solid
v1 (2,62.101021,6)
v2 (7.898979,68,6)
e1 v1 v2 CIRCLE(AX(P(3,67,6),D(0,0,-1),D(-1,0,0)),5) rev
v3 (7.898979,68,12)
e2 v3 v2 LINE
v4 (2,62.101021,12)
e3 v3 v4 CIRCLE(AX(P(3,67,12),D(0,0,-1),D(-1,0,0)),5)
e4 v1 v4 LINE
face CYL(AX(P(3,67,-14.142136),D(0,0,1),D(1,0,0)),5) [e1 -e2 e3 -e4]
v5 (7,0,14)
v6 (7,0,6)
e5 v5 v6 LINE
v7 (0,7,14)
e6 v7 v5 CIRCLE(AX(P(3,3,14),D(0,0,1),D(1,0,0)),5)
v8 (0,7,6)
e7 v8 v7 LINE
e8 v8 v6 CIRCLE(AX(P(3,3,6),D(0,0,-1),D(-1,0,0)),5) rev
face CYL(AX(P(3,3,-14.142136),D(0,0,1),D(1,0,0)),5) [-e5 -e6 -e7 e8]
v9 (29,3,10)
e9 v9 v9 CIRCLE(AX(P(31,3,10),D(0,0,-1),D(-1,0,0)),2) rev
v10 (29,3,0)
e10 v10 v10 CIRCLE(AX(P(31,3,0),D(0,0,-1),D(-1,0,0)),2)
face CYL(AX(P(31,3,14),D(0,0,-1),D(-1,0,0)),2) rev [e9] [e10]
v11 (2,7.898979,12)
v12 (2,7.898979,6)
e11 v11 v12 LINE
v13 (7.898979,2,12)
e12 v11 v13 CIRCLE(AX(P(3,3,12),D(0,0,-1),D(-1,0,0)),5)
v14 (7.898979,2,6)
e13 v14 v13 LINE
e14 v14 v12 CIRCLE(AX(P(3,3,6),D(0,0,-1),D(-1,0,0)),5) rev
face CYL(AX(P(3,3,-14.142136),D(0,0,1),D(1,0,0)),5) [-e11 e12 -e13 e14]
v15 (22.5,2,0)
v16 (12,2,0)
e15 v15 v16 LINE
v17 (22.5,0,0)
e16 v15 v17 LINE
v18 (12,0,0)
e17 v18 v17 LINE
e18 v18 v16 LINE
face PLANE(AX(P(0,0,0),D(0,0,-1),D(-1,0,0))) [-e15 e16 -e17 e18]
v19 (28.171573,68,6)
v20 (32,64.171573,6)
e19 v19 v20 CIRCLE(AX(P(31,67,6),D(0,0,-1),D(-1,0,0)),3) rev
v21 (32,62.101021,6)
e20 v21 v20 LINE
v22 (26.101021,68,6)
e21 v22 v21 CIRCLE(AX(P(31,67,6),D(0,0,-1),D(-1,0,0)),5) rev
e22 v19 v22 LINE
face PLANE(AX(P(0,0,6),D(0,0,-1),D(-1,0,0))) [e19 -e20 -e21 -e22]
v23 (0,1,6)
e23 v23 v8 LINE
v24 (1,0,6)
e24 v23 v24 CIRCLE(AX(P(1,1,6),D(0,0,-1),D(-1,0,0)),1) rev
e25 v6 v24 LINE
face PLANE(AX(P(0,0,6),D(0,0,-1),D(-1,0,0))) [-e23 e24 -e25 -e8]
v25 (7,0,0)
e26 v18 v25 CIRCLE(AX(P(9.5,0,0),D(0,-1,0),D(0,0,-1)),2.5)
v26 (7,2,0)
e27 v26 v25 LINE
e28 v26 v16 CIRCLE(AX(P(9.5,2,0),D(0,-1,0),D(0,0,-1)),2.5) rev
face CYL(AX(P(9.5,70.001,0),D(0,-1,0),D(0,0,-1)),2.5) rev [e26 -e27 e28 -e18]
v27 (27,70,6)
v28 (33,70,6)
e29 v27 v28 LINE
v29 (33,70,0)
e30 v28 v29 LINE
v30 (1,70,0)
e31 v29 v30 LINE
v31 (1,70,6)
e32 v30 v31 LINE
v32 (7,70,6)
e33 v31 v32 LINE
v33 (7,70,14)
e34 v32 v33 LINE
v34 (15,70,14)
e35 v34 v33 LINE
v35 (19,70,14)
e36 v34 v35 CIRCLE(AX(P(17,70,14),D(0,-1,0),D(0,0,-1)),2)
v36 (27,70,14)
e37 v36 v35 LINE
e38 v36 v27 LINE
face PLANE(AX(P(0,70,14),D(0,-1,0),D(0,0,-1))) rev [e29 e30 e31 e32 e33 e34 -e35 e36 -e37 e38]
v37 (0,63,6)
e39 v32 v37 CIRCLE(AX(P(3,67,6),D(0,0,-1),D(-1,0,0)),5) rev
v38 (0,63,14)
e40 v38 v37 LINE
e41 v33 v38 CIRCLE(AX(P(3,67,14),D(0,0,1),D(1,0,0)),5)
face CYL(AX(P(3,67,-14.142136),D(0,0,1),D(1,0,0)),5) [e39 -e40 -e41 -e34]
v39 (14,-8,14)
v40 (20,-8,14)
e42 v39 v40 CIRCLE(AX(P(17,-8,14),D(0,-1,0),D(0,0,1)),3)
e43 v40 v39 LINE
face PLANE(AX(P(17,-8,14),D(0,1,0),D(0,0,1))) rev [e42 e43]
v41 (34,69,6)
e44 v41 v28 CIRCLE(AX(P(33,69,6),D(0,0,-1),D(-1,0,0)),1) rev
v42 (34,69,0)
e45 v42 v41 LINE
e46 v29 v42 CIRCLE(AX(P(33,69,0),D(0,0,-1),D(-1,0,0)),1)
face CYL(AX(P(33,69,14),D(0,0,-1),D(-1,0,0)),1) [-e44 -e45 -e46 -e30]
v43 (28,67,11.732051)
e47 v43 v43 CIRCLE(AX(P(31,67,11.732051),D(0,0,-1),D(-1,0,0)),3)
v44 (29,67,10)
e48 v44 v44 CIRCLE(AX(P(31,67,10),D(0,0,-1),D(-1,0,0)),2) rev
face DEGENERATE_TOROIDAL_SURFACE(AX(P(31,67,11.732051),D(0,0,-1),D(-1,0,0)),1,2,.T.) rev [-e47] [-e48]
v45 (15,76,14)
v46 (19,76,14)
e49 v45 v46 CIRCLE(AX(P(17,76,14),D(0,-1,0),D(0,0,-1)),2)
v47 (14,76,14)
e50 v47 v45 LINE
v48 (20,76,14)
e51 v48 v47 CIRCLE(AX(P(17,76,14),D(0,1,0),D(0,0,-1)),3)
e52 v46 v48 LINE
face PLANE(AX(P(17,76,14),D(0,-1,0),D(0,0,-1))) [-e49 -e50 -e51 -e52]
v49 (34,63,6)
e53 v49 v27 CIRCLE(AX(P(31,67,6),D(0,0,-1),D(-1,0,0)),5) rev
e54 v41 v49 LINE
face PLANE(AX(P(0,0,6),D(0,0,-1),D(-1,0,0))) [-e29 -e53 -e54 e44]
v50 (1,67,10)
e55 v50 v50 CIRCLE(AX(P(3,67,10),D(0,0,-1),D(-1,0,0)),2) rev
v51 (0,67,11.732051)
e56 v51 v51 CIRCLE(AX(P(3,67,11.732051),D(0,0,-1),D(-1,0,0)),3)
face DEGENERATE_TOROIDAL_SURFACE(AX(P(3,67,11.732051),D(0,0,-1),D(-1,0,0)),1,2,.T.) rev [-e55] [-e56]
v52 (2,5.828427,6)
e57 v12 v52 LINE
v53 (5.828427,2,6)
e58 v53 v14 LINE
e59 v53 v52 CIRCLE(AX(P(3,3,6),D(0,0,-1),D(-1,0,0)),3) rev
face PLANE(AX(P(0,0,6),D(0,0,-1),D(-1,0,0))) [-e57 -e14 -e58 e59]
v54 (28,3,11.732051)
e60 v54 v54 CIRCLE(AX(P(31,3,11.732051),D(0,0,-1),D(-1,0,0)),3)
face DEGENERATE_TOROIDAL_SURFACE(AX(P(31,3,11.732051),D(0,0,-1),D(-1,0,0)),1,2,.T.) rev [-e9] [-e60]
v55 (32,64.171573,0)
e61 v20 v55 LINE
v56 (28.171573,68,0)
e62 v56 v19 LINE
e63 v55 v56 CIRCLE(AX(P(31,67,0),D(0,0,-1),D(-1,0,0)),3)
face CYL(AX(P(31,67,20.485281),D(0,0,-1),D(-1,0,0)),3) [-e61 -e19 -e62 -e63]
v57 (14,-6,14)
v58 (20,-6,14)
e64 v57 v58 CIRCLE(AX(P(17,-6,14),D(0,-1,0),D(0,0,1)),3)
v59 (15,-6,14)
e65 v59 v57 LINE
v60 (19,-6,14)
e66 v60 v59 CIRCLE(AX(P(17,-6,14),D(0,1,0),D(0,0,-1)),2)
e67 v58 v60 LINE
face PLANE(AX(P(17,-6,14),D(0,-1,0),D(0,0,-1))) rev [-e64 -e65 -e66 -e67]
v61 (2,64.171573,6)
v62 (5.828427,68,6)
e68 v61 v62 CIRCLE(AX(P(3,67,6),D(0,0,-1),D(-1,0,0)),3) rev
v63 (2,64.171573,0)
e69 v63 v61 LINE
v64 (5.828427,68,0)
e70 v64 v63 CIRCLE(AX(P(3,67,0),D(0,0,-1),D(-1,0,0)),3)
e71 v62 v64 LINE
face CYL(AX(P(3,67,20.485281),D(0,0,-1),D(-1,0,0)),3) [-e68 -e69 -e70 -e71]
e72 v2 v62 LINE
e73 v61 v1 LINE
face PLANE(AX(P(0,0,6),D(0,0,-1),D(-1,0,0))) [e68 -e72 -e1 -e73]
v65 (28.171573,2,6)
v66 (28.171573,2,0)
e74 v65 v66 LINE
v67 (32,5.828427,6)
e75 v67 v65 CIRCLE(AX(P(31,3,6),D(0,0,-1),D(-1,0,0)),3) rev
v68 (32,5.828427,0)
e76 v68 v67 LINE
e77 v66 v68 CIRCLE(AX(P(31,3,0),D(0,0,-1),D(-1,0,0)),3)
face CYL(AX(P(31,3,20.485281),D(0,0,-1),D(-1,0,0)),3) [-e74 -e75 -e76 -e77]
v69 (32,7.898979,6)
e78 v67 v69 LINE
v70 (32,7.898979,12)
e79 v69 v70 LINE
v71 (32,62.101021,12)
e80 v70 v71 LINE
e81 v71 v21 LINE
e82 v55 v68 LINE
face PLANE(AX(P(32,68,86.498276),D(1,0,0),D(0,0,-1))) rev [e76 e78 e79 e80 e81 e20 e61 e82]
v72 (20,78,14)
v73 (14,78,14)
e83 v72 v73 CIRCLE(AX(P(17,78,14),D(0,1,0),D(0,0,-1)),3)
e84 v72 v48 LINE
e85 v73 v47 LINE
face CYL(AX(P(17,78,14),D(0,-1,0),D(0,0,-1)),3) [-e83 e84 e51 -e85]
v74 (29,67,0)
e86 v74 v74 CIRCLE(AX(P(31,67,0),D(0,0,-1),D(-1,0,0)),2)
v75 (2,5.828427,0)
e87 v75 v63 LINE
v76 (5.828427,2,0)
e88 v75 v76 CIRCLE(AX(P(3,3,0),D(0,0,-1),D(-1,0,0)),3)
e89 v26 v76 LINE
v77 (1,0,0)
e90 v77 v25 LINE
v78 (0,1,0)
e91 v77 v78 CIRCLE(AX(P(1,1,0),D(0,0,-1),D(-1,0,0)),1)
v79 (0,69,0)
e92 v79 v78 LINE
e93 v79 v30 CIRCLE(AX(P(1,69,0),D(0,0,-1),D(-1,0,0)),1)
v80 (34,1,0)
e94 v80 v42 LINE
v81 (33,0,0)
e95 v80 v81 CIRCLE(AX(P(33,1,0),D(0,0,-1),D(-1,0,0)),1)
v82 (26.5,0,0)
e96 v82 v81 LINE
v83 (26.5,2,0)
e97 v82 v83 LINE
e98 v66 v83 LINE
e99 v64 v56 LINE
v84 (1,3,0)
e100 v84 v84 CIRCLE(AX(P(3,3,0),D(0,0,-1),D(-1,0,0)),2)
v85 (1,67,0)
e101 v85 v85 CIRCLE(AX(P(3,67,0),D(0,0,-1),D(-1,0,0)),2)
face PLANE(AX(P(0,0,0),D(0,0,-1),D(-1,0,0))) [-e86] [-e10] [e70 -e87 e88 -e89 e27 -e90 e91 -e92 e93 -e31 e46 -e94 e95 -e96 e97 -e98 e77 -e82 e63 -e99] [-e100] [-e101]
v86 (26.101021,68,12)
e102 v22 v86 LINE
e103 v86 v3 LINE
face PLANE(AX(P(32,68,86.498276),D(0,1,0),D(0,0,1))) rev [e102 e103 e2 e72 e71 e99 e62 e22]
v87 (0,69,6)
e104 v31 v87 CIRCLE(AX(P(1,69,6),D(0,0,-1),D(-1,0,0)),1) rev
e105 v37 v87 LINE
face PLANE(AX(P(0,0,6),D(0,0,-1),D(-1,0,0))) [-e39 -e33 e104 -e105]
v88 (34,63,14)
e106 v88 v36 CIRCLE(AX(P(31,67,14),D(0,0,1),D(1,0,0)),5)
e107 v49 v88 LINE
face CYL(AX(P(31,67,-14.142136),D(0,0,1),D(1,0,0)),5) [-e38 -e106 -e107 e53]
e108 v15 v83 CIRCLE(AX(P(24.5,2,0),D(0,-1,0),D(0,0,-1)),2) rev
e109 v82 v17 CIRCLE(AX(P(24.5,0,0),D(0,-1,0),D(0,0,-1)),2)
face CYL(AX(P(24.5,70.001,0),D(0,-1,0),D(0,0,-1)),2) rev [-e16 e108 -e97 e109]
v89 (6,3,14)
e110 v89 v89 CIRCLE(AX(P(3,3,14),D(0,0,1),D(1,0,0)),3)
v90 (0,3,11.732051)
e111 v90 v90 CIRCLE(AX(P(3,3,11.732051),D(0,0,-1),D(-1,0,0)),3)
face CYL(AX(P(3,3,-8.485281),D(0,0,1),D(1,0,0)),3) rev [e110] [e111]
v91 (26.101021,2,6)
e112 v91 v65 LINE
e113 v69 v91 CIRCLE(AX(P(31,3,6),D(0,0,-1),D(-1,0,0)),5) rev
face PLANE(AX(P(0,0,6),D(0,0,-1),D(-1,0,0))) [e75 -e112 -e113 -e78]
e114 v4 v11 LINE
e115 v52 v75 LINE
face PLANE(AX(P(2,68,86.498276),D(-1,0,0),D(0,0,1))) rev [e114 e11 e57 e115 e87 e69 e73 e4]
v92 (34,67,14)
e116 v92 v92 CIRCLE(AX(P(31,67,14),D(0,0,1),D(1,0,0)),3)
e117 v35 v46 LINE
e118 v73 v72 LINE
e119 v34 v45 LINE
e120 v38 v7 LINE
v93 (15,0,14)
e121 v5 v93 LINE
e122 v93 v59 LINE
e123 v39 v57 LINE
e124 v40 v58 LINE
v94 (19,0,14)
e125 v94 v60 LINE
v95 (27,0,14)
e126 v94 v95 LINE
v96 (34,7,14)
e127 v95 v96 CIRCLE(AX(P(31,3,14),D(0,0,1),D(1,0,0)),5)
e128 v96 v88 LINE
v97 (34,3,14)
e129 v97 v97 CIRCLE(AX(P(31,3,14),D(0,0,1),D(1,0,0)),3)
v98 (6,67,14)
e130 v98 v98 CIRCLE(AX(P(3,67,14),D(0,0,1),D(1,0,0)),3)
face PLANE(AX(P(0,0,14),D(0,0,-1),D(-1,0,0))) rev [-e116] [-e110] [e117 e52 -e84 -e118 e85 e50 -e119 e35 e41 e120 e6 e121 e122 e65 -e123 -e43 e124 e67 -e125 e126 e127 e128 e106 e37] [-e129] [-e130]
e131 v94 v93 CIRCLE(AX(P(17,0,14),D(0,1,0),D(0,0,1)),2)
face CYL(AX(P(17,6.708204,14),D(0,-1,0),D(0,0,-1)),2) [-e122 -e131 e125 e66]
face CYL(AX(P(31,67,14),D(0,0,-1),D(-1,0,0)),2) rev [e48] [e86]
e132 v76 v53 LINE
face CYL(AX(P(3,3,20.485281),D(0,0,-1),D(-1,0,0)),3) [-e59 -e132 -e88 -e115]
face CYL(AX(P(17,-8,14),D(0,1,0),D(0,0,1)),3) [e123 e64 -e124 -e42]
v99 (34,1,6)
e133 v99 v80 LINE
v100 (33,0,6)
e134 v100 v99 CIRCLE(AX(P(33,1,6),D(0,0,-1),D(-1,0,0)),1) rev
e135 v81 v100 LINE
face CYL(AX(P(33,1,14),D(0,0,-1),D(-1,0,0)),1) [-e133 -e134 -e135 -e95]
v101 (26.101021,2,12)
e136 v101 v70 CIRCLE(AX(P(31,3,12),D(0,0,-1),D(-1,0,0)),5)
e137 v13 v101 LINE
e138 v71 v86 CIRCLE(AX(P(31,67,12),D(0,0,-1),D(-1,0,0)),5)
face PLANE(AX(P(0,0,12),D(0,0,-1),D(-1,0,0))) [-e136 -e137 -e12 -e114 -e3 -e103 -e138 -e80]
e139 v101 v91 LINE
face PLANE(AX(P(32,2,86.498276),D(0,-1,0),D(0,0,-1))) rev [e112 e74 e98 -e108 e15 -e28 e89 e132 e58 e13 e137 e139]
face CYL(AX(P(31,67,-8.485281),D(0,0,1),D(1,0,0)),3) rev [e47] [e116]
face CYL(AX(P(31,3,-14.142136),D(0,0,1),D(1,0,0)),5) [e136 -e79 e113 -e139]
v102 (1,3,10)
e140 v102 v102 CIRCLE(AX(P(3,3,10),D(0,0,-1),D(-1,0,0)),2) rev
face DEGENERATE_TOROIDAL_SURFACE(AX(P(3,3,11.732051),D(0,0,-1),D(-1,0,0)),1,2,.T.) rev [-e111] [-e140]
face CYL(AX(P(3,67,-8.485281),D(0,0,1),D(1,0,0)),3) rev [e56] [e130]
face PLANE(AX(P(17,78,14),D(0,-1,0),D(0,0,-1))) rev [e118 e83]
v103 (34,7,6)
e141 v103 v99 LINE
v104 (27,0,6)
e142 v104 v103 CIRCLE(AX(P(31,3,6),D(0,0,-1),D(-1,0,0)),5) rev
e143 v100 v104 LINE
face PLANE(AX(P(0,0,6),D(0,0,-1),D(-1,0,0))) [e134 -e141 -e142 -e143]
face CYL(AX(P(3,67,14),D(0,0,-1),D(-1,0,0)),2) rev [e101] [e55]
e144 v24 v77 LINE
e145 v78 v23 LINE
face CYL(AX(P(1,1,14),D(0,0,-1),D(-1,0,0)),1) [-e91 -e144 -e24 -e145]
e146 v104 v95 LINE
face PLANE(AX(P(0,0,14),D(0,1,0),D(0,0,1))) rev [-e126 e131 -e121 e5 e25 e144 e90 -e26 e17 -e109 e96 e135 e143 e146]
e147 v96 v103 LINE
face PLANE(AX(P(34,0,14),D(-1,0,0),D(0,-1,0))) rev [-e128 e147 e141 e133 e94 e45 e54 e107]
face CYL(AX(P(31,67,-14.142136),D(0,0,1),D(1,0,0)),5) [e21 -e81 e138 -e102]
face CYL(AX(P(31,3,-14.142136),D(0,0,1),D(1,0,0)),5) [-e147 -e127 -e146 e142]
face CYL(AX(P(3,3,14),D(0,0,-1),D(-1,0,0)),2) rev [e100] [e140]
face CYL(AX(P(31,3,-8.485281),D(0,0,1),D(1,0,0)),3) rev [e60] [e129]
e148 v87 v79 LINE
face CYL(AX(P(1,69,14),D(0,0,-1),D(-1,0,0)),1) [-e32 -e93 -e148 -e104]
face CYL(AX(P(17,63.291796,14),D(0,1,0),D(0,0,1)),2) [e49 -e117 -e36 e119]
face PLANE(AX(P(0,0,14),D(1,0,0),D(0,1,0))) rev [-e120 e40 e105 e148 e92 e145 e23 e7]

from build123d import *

# Parameters (mm, degrees)
SKETCH1_W           = 34
SKETCH1_H           = 70
BOSS_EXTRUDE1_DEPTH = 14
SKETCH2_W           = 30
SKETCH2_H           = 66
CUT_EXTRUDE1_DEPTH  = 12
SKETCH3_R           = 3
BOSS_EXTRUDE2_DEPTH = 12
SKETCH4_R           = 2
CUT_EXTRUDE2_DEPTH  = 80.069589603
CUT_EXTRUDE4_REACH  = 81.07
SKETCH6_R           = 2.5
SKETCH6_R_2         = 2
FILLET1_R           = 1
BOSS_EXTRUDE3_START = -8
SKETCH7_R           = 5
SKETCH7_R_2         = 3
BOSS_EXTRUDE3_DEPTH = 8
CUT_EXTRUDE7_START  = -4
SKETCH8_R           = 3
CUT_EXTRUDE7_DEPTH  = 4
BOSS_EXTRUDE4_DEPTH = 8
CUT_EXTRUDE8_START  = -8
CUT_EXTRUDE8_DEPTH  = 6
BOSS_EXTRUDE5_START = 8
BOSS_EXTRUDE5_DEPTH = 8
CUT_EXTRUDE9_START  = -2
CUT_EXTRUDE9_DEPTH  = 6
FILLET3_R           = 2


with BuildPart() as part:
    # Sketch1 → Boss-Extrude1 (new body)
    with BuildSketch(Plane.XY):
        with Locations((17, 35)):
            Rectangle(SKETCH1_W, SKETCH1_H)
    extrude(amount=BOSS_EXTRUDE1_DEPTH)

    # Sketch2 → Cut-Extrude1 (cut)
    with BuildSketch(Plane(origin=(0, 0, 0), x_dir=(-1, 0, 0), z_dir=(0, 0, -1))):
        with Locations((-17, 35)):
            Rectangle(SKETCH2_W, SKETCH2_H)
    extrude(amount=-CUT_EXTRUDE1_DEPTH, mode=Mode.SUBTRACT)

    # Sketch3 → Boss-Extrude2 (add)
    with BuildSketch(Plane(origin=(0, 0, 0), x_dir=(-1, 0, 0), z_dir=(0, 0, -1))):
        with Locations((-31, 67)):
            Circle(SKETCH3_R)
        with Locations((-3, 67)):
            Circle(SKETCH3_R)
        with Locations((-3, 3)):
            Circle(SKETCH3_R)
        with Locations((-31, 3)):
            Circle(SKETCH3_R)
    extrude(amount=-BOSS_EXTRUDE2_DEPTH)

    # Sketch4 → Cut-Extrude2 (cut, through all)
    with BuildSketch(Plane(origin=(0, 0, 0), x_dir=(-1, 0, 0), z_dir=(0, 0, -1))):
        with Locations((-3, 67)):
            Circle(SKETCH4_R)
        with Locations((-31, 67)):
            Circle(SKETCH4_R)
        with Locations((-3, 3)):
            Circle(SKETCH4_R)
        with Locations((-31, 3)):
            Circle(SKETCH4_R)
    extrude(amount=-CUT_EXTRUDE2_DEPTH, mode=Mode.SUBTRACT)

    # Sketch6 → Cut-Extrude4 (cut, up to next)
    with BuildSketch(Plane.XZ, mode=Mode.PRIVATE) as cut_extrude4_sk1:
        with Locations((9.5, 0)):
            Circle(SKETCH6_R)
    cut_extrude4_tool1 = extrude(cut_extrude4_sk1.sketch, amount=-CUT_EXTRUDE4_REACH, mode=Mode.PRIVATE) & part.part
    # Sketch6 → Cut-Extrude4 (cut, up to next)
    with BuildSketch(Plane.XZ, mode=Mode.PRIVATE) as cut_extrude4_sk2:
        with Locations((24.5, 0)):
            Circle(SKETCH6_R_2)
    cut_extrude4_tool2 = extrude(cut_extrude4_sk2.sketch, amount=-CUT_EXTRUDE4_REACH, mode=Mode.PRIVATE) & part.part
    add(cut_extrude4_tool1.solids().sort_by_distance((9.5, 0, 0))[0], mode=Mode.SUBTRACT)
    add(cut_extrude4_tool2.solids().sort_by_distance((24.5, 0, 0))[0], mode=Mode.SUBTRACT)

    # Fillet1
    fillet1_edges = [part.edges().sort_by_distance(p)[0] for p in [
        (0, 70, 7),
        (34, 70, 7),
        (34, 0, 7),
        (0, 0, 7),
    ]]
    fillet(fillet1_edges, radius=FILLET1_R)

    # Sketch7 → Boss-Extrude3 (add)
    # profile 1 of 4: a face of its own
    with BuildSketch(Plane.XY.offset(14).offset(BOSS_EXTRUDE3_START)):
        with Locations((31, 67)):
            Circle(SKETCH7_R)
        with Locations((31, 67)):
            Circle(SKETCH7_R_2, mode=Mode.SUBTRACT)
    # profile 2 of 4: a face of its own
    with BuildSketch(Plane.XY.offset(14).offset(BOSS_EXTRUDE3_START)):
        with Locations((3, 67)):
            Circle(SKETCH7_R)
        with Locations((3, 67)):
            Circle(SKETCH7_R_2, mode=Mode.SUBTRACT)
    # profile 3 of 4: a face of its own
    with BuildSketch(Plane.XY.offset(14).offset(BOSS_EXTRUDE3_START)):
        with Locations((31, 3)):
            Circle(SKETCH7_R)
        with Locations((31, 3)):
            Circle(SKETCH7_R_2, mode=Mode.SUBTRACT)
    # profile 4 of 4: a face of its own
    with BuildSketch(Plane.XY.offset(14).offset(BOSS_EXTRUDE3_START)):
        with Locations((3, 3)):
            Circle(SKETCH7_R)
        with Locations((3, 3)):
            Circle(SKETCH7_R_2, mode=Mode.SUBTRACT)
    extrude(amount=BOSS_EXTRUDE3_DEPTH)

    # Sketch8 → Cut-Extrude7 (cut)
    with BuildSketch(Plane.XY.offset(14).offset(CUT_EXTRUDE7_START)):
        with Locations((3, 3)):
            Circle(SKETCH8_R)
        with Locations((31, 3)):
            Circle(SKETCH8_R)
        with Locations((31, 67)):
            Circle(SKETCH8_R)
        with Locations((3, 67)):
            Circle(SKETCH8_R)
    extrude(amount=CUT_EXTRUDE7_DEPTH, mode=Mode.SUBTRACT)

    # Sketch9 → Boss-Extrude4 (add)
    with BuildSketch(Plane(origin=(0, 70, 0), x_dir=(1, 0, 0), z_dir=(0, 1, 0))):
        with BuildLine():
            Line((20, -14), (14, -14))
            ThreePointArc((14, -14), (17, -11), (20, -14))
        make_face()
    extrude(amount=BOSS_EXTRUDE4_DEPTH)

    # Sketch10 → Cut-Extrude8 (cut)
    with BuildSketch(Plane(origin=(0, 78, 0), x_dir=(1, 0, 0), z_dir=(0, 1, 0)).offset(CUT_EXTRUDE8_START)):
        with BuildLine():
            Line((19, -14), (20, -14))
            ThreePointArc((20, -14), (17, -11), (14, -14))
            Line((14, -14), (15, -14))
            ThreePointArc((15, -14), (17, -12), (19, -14))
        make_face()
    extrude(amount=CUT_EXTRUDE8_DEPTH, mode=Mode.SUBTRACT)

    # Sketch11 → Boss-Extrude5 (add)
    with BuildSketch(Plane.XZ.offset(BOSS_EXTRUDE5_START)):
        with BuildLine():
            Line((20, 14), (14, 14))
            ThreePointArc((14, 14), (17, 11), (20, 14))
        make_face()
    extrude(amount=-BOSS_EXTRUDE5_DEPTH)

    # Sketch12 → Cut-Extrude9 (cut)
    with BuildSketch(Plane.XZ.offset(8).offset(CUT_EXTRUDE9_START)):
        with BuildLine():
            Line((14, 14), (15, 14))
            ThreePointArc((15, 14), (17, 12), (19, 14))
            Line((19, 14), (20, 14))
            ThreePointArc((20, 14), (17, 11), (14, 14))
        make_face()
    extrude(amount=-CUT_EXTRUDE9_DEPTH, mode=Mode.SUBTRACT)

    # Fillet3
    # the kernel refuses this fillet: 2 mm, written as the material it adds along each edge
    with BuildSketch(Plane(origin=(3, 67, 10), x_dir=(1, 0, 0), z_dir=(0, -1, 0))) as fillet3_piece_1_section:
        with BuildLine():
            CenterArc((1, 1.732050808), FILLET3_R, 300, 60)
            Line((2, 0), (2.02, -0.034641016))
            ThreePointArc((2.02, -0.034641016), (2.5, -0.04), (3, -0.04))
            Line((3, -0.04), (3.04, 0))
            Line((3.04, 0), (3.04, 1.732050808))
            Line((3.04, 1.732050808), (3, 1.732050808))
        make_face()
    fillet3_piece_1 = revolve(axis=Axis((3, 67, 10), (0, 0, 1)), mode=Mode.PRIVATE)
    fillet3_piece_1 = fillet3_piece_1 - Plane(origin=(3, 67, 10.721085361), x_dir=(-1, 0, 0), z_dir=(0, 0, -1)) * Cylinder(2, 13, mode=Mode.PRIVATE)
    add(fillet3_piece_1)
    with BuildSketch(Plane(origin=(31, 67, 10), x_dir=(1, 0, 0), z_dir=(0, -1, 0))) as fillet3_piece_2_section:
        with BuildLine():
            CenterArc((1, 1.732050808), FILLET3_R, 300, 60)
            Line((2, 0), (2.02, -0.034641016))
            ThreePointArc((2.02, -0.034641016), (2.5, -0.04), (3, -0.04))
            Line((3, -0.04), (3.04, 0))
            Line((3.04, 0), (3.04, 1.732050808))
            Line((3.04, 1.732050808), (3, 1.732050808))
        make_face()
    fillet3_piece_2 = revolve(axis=Axis((31, 67, 10), (0, 0, 1)), mode=Mode.PRIVATE)
    fillet3_piece_2 = fillet3_piece_2 - Plane(origin=(31, 67, 10.721085361), x_dir=(-1, 0, 0), z_dir=(0, 0, -1)) * Cylinder(2, 13, mode=Mode.PRIVATE)
    add(fillet3_piece_2)
    with BuildSketch(Plane(origin=(31, 3, 10), x_dir=(1, 0, 0), z_dir=(0, -1, 0))) as fillet3_piece_3_section:
        with BuildLine():
            CenterArc((1, 1.732050808), FILLET3_R, 300, 60)
            Line((2, 0), (2.02, -0.034641016))
            ThreePointArc((2.02, -0.034641016), (2.5, -0.04), (3, -0.04))
            Line((3, -0.04), (3.04, 0))
            Line((3.04, 0), (3.04, 1.732050808))
            Line((3.04, 1.732050808), (3, 1.732050808))
        make_face()
    fillet3_piece_3 = revolve(axis=Axis((31, 3, 10), (0, 0, 1)), mode=Mode.PRIVATE)
    fillet3_piece_3 = fillet3_piece_3 - Plane(origin=(31, 3, 10.721085361), x_dir=(-1, 0, 0), z_dir=(0, 0, -1)) * Cylinder(2, 13, mode=Mode.PRIVATE)
    add(fillet3_piece_3)
    with BuildSketch(Plane(origin=(3, 3, 10), x_dir=(1, 0, 0), z_dir=(0, -1, 0))) as fillet3_piece_4_section:
        with BuildLine():
            CenterArc((1, 1.732050808), FILLET3_R, 300, 60)
            Line((2, 0), (2.02, -0.034641016))
            ThreePointArc((2.02, -0.034641016), (2.5, -0.04), (3, -0.04))
            Line((3, -0.04), (3.04, 0))
            Line((3.04, 0), (3.04, 1.732050808))
            Line((3.04, 1.732050808), (3, 1.732050808))
        make_face()
    fillet3_piece_4 = revolve(axis=Axis((3, 3, 10), (0, 0, 1)), mode=Mode.PRIVATE)
    fillet3_piece_4 = fillet3_piece_4 - Plane(origin=(3, 3, 10.721085361), x_dir=(-1, 0, 0), z_dir=(0, 0, -1)) * Cylinder(2, 13, mode=Mode.PRIVATE)
    add(fillet3_piece_4)


solid = part.part
